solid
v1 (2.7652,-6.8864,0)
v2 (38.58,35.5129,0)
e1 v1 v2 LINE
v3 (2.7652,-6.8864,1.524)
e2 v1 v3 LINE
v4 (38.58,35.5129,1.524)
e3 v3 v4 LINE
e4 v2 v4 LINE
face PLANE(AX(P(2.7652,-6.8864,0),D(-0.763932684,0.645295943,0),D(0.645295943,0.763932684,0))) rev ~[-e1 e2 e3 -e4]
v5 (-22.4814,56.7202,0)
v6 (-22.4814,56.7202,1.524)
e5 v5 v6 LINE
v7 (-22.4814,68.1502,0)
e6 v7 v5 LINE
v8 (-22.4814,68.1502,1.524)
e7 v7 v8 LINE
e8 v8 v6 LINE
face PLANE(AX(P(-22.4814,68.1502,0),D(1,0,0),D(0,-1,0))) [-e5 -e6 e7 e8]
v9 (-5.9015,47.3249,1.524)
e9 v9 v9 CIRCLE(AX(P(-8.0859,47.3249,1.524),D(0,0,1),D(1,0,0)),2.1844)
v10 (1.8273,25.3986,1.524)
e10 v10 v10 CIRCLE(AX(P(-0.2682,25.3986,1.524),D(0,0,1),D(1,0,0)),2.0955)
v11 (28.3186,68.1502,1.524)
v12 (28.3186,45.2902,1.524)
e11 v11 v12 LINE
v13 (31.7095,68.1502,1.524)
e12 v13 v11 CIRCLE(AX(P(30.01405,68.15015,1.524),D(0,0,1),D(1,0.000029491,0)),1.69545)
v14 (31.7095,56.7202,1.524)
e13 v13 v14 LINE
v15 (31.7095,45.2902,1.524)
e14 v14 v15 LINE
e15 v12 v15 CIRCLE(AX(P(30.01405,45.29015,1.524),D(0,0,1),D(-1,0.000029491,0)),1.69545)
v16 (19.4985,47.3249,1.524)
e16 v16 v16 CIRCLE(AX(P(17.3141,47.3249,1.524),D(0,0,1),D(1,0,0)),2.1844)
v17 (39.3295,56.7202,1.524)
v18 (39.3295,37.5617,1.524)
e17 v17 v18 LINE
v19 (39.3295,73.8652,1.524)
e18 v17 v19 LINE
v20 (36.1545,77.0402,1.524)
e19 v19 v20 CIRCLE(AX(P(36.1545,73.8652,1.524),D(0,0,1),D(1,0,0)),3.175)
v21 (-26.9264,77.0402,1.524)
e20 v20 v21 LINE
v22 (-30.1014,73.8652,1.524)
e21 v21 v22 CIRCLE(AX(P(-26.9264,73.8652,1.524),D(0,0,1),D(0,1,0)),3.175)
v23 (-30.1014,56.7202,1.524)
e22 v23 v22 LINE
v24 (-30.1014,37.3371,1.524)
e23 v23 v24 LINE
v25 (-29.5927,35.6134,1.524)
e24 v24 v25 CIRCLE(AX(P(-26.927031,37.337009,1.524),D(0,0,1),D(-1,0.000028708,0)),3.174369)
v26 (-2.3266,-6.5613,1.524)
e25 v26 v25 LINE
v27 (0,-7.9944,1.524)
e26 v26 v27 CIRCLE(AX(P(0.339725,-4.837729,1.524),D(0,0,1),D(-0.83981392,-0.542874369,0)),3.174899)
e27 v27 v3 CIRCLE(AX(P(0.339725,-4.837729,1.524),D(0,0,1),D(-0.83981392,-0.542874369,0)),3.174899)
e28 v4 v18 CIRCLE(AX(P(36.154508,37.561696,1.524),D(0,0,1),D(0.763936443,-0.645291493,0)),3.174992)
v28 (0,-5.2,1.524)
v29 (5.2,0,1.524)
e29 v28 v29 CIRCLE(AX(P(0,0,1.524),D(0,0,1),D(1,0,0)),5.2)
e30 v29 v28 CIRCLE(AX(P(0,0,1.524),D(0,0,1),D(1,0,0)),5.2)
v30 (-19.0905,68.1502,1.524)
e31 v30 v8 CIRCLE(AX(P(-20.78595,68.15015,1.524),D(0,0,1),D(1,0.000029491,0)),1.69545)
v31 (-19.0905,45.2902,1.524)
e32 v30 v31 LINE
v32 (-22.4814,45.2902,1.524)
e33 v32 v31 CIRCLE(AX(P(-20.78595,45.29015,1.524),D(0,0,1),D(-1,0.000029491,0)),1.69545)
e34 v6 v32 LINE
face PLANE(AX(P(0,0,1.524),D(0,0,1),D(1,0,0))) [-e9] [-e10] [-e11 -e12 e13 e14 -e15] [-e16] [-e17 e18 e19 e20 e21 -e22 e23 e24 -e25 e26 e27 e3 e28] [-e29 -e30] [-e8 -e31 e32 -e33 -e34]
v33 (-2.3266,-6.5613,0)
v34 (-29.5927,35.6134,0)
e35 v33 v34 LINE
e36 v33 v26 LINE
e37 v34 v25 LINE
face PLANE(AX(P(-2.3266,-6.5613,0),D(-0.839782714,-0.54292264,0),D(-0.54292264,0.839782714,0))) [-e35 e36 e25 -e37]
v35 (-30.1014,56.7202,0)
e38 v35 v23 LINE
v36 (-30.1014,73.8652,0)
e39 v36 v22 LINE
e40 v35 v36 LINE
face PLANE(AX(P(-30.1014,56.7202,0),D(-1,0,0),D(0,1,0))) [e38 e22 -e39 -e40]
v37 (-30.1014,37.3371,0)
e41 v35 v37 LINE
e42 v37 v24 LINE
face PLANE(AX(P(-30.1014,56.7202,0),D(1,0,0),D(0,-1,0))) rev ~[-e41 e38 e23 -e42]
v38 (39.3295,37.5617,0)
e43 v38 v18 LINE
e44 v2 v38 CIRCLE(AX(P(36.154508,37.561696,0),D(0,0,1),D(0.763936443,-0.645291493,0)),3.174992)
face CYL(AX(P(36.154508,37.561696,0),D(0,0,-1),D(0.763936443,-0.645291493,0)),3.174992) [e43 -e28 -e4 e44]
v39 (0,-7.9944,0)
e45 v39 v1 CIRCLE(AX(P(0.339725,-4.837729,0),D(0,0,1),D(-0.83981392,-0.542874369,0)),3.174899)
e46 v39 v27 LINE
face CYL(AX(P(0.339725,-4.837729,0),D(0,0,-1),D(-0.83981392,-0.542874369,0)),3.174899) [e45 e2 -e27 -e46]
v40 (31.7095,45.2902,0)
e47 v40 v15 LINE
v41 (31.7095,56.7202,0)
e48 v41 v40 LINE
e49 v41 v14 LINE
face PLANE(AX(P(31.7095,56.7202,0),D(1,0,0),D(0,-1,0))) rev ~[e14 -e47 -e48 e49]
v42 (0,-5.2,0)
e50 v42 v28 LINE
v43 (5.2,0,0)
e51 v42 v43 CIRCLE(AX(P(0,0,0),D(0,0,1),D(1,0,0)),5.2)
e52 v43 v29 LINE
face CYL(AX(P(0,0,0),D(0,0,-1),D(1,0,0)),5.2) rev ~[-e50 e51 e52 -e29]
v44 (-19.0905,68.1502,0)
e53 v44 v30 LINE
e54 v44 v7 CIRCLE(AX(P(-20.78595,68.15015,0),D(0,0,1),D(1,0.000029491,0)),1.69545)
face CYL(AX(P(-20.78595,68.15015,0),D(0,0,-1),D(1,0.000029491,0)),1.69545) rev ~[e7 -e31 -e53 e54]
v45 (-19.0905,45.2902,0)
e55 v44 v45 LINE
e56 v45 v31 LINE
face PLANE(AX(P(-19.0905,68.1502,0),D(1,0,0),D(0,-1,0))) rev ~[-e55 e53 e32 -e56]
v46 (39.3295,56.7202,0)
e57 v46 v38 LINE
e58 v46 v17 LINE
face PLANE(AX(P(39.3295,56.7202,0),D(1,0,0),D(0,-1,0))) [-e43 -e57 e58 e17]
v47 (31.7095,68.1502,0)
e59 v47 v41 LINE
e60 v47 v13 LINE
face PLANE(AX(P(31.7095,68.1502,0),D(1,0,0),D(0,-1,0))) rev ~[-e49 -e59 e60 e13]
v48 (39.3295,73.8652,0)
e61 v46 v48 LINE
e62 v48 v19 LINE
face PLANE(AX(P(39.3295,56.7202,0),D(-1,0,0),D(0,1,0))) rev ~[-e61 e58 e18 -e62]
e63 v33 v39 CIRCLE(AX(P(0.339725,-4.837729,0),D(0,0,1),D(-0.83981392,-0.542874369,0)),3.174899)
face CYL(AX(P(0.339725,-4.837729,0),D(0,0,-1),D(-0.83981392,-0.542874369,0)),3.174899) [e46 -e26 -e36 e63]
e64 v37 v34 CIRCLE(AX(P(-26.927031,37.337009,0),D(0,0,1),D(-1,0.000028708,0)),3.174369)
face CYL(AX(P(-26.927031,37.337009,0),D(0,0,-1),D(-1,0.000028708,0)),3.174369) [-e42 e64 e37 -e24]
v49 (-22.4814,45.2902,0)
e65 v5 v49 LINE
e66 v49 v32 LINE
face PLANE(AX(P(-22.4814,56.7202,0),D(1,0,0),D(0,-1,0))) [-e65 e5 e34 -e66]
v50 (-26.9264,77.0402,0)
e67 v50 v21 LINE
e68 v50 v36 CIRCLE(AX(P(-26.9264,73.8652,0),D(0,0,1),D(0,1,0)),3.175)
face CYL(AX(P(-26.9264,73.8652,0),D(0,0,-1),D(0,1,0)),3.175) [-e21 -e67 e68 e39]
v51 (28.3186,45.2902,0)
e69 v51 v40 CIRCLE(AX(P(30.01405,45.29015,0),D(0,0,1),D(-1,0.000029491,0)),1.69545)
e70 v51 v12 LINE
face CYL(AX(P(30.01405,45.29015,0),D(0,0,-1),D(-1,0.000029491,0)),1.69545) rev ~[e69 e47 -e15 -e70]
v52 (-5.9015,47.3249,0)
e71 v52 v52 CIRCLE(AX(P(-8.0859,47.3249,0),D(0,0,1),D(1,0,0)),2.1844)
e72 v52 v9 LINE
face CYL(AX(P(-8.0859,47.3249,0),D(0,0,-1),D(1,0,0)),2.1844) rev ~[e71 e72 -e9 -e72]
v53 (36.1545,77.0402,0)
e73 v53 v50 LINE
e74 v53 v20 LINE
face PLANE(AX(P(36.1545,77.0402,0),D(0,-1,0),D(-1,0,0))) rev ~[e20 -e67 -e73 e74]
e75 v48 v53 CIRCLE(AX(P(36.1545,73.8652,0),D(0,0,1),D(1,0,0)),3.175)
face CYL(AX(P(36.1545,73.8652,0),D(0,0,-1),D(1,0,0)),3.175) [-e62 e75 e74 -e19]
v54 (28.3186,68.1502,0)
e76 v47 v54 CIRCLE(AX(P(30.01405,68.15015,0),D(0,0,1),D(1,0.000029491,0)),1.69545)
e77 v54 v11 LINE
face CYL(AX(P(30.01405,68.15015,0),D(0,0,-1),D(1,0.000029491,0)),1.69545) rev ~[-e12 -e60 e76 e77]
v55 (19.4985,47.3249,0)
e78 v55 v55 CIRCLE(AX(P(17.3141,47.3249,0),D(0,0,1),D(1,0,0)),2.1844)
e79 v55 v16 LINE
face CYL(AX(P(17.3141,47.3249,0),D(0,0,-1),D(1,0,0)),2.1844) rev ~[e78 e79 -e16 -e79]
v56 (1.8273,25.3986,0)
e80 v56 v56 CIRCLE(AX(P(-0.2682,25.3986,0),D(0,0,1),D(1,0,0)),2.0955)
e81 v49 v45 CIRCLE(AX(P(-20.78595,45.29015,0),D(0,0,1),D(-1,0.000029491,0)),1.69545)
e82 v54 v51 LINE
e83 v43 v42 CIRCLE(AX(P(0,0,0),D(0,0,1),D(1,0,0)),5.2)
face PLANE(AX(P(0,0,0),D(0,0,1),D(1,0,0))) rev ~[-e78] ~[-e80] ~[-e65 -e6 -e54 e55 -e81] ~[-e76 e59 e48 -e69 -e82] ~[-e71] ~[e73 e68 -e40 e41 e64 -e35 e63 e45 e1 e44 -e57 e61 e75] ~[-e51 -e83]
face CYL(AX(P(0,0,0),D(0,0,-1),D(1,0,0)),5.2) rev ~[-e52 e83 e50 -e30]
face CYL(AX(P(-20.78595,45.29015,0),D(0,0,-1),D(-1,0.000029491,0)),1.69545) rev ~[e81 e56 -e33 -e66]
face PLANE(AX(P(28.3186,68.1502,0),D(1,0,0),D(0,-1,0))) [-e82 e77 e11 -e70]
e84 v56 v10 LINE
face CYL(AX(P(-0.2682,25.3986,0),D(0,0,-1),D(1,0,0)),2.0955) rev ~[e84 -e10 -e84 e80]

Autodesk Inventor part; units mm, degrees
ref_plane "YZ Plane" through (0, 0, 0) normal (1, 0, 0) x (0, 1, 0)
ref_plane "XZ Plane" through (0, 0, 0) normal (0, 1, 0) x (-1, 0, 0)
ref_plane "XY Plane" through (0, 0, 0) normal (0, 0, 1) x (1, 0, 0)
sketch "Sketch1" plane through (0, 0, 0) normal (0, 0, 1) x (1, 0, 0)
  circle A0 centre (-0.2682, 25.3986) radius 2.0955
  circle A1 centre (0, 0) radius 5.2 projected
  line L0 (-19.0905, 68.1502) -> (-19.0905, 45.2902)
  line L1 (-22.4814, 68.1502) -> (-22.4814, 45.2902)
  line L2 (28.3186, 68.1502) -> (28.3186, 45.2902)
  line L3 (31.7095, 68.1502) -> (31.7095, 45.2902)
  arc A2 (-19.0905, 68.1502) -> (-22.4814, 68.1502) centre (-20.7859, 68.1502) ccw
  arc A3 (-22.4814, 45.2902) -> (-19.0905, 45.2902) centre (-20.7859, 45.2902) ccw
  arc A4 (31.7095, 68.1502) -> (28.3186, 68.1502) centre (30.0141, 68.1502) ccw
  arc A5 (28.3186, 45.2902) -> (31.7095, 45.2902) centre (30.0141, 45.2902) ccw
  line L4 (-22.4814, 56.7202) -> (-30.1014, 56.7202)
  line L5 (-30.1014, 56.7202) -> (-30.1014, 73.8652)
  line L6 (31.7095, 56.7202) -> (39.3295, 56.7202)
  line L7 (39.3295, 56.7202) -> (39.3295, 73.8652)
  line L8 (36.1545, 77.0402) -> (-26.9264, 77.0402)
  line L9 (-30.1014, 56.7202) -> (-30.1014, 37.3371)
  line L10 (39.3295, 56.7202) -> (39.3295, 37.5617)
  line L11 (0, 0) -> (0, -10.16)
  line L12 (-2.3266, -6.5613) -> (-29.5927, 35.6134)
  line L13 (2.7652, -6.8864) -> (38.58, 35.5129)
  arc A6 (-30.1014, 37.3371) -> (-29.5927, 35.6134) centre (-26.9264, 37.3371) ccw
  arc A7 (-26.9264, 77.0402) -> (-30.1014, 73.8652) centre (-26.9264, 73.8652) ccw
  arc A8 (39.3295, 73.8652) -> (36.1545, 77.0402) centre (36.1545, 73.8652) ccw
  arc A9 (38.58, 35.5129) -> (39.3295, 37.5617) centre (36.1545, 37.5617) ccw
  arc A10 (-2.3266, -6.5613) -> (2.7652, -6.8864) centre (0.3398, -4.8376) ccw
  circle A11 centre (-8.0859, 47.3249) radius 2.1844 projected
  circle A12 centre (17.3141, 47.3249) radius 2.1844 projected
  point P0 (0, 0)
  point P1 (-30.1014, 77.0402)
  point P2 (-30.1014, 36.4002)
  point P3 (39.3295, 36.4002)
  dimension "d5" = 7.62
  dimension "d6" = 20.32
  dimension "d7" = 7.62
  dimension "d8" = 20.32
  dimension "d9" = 20.32
  dimension "d10" = 10.16
  dimension "d11" = 3.175
  dimension "d12" = 4.191
extrude "Extrusion1" add sketch "Sketch1" along normal blind 1.524
